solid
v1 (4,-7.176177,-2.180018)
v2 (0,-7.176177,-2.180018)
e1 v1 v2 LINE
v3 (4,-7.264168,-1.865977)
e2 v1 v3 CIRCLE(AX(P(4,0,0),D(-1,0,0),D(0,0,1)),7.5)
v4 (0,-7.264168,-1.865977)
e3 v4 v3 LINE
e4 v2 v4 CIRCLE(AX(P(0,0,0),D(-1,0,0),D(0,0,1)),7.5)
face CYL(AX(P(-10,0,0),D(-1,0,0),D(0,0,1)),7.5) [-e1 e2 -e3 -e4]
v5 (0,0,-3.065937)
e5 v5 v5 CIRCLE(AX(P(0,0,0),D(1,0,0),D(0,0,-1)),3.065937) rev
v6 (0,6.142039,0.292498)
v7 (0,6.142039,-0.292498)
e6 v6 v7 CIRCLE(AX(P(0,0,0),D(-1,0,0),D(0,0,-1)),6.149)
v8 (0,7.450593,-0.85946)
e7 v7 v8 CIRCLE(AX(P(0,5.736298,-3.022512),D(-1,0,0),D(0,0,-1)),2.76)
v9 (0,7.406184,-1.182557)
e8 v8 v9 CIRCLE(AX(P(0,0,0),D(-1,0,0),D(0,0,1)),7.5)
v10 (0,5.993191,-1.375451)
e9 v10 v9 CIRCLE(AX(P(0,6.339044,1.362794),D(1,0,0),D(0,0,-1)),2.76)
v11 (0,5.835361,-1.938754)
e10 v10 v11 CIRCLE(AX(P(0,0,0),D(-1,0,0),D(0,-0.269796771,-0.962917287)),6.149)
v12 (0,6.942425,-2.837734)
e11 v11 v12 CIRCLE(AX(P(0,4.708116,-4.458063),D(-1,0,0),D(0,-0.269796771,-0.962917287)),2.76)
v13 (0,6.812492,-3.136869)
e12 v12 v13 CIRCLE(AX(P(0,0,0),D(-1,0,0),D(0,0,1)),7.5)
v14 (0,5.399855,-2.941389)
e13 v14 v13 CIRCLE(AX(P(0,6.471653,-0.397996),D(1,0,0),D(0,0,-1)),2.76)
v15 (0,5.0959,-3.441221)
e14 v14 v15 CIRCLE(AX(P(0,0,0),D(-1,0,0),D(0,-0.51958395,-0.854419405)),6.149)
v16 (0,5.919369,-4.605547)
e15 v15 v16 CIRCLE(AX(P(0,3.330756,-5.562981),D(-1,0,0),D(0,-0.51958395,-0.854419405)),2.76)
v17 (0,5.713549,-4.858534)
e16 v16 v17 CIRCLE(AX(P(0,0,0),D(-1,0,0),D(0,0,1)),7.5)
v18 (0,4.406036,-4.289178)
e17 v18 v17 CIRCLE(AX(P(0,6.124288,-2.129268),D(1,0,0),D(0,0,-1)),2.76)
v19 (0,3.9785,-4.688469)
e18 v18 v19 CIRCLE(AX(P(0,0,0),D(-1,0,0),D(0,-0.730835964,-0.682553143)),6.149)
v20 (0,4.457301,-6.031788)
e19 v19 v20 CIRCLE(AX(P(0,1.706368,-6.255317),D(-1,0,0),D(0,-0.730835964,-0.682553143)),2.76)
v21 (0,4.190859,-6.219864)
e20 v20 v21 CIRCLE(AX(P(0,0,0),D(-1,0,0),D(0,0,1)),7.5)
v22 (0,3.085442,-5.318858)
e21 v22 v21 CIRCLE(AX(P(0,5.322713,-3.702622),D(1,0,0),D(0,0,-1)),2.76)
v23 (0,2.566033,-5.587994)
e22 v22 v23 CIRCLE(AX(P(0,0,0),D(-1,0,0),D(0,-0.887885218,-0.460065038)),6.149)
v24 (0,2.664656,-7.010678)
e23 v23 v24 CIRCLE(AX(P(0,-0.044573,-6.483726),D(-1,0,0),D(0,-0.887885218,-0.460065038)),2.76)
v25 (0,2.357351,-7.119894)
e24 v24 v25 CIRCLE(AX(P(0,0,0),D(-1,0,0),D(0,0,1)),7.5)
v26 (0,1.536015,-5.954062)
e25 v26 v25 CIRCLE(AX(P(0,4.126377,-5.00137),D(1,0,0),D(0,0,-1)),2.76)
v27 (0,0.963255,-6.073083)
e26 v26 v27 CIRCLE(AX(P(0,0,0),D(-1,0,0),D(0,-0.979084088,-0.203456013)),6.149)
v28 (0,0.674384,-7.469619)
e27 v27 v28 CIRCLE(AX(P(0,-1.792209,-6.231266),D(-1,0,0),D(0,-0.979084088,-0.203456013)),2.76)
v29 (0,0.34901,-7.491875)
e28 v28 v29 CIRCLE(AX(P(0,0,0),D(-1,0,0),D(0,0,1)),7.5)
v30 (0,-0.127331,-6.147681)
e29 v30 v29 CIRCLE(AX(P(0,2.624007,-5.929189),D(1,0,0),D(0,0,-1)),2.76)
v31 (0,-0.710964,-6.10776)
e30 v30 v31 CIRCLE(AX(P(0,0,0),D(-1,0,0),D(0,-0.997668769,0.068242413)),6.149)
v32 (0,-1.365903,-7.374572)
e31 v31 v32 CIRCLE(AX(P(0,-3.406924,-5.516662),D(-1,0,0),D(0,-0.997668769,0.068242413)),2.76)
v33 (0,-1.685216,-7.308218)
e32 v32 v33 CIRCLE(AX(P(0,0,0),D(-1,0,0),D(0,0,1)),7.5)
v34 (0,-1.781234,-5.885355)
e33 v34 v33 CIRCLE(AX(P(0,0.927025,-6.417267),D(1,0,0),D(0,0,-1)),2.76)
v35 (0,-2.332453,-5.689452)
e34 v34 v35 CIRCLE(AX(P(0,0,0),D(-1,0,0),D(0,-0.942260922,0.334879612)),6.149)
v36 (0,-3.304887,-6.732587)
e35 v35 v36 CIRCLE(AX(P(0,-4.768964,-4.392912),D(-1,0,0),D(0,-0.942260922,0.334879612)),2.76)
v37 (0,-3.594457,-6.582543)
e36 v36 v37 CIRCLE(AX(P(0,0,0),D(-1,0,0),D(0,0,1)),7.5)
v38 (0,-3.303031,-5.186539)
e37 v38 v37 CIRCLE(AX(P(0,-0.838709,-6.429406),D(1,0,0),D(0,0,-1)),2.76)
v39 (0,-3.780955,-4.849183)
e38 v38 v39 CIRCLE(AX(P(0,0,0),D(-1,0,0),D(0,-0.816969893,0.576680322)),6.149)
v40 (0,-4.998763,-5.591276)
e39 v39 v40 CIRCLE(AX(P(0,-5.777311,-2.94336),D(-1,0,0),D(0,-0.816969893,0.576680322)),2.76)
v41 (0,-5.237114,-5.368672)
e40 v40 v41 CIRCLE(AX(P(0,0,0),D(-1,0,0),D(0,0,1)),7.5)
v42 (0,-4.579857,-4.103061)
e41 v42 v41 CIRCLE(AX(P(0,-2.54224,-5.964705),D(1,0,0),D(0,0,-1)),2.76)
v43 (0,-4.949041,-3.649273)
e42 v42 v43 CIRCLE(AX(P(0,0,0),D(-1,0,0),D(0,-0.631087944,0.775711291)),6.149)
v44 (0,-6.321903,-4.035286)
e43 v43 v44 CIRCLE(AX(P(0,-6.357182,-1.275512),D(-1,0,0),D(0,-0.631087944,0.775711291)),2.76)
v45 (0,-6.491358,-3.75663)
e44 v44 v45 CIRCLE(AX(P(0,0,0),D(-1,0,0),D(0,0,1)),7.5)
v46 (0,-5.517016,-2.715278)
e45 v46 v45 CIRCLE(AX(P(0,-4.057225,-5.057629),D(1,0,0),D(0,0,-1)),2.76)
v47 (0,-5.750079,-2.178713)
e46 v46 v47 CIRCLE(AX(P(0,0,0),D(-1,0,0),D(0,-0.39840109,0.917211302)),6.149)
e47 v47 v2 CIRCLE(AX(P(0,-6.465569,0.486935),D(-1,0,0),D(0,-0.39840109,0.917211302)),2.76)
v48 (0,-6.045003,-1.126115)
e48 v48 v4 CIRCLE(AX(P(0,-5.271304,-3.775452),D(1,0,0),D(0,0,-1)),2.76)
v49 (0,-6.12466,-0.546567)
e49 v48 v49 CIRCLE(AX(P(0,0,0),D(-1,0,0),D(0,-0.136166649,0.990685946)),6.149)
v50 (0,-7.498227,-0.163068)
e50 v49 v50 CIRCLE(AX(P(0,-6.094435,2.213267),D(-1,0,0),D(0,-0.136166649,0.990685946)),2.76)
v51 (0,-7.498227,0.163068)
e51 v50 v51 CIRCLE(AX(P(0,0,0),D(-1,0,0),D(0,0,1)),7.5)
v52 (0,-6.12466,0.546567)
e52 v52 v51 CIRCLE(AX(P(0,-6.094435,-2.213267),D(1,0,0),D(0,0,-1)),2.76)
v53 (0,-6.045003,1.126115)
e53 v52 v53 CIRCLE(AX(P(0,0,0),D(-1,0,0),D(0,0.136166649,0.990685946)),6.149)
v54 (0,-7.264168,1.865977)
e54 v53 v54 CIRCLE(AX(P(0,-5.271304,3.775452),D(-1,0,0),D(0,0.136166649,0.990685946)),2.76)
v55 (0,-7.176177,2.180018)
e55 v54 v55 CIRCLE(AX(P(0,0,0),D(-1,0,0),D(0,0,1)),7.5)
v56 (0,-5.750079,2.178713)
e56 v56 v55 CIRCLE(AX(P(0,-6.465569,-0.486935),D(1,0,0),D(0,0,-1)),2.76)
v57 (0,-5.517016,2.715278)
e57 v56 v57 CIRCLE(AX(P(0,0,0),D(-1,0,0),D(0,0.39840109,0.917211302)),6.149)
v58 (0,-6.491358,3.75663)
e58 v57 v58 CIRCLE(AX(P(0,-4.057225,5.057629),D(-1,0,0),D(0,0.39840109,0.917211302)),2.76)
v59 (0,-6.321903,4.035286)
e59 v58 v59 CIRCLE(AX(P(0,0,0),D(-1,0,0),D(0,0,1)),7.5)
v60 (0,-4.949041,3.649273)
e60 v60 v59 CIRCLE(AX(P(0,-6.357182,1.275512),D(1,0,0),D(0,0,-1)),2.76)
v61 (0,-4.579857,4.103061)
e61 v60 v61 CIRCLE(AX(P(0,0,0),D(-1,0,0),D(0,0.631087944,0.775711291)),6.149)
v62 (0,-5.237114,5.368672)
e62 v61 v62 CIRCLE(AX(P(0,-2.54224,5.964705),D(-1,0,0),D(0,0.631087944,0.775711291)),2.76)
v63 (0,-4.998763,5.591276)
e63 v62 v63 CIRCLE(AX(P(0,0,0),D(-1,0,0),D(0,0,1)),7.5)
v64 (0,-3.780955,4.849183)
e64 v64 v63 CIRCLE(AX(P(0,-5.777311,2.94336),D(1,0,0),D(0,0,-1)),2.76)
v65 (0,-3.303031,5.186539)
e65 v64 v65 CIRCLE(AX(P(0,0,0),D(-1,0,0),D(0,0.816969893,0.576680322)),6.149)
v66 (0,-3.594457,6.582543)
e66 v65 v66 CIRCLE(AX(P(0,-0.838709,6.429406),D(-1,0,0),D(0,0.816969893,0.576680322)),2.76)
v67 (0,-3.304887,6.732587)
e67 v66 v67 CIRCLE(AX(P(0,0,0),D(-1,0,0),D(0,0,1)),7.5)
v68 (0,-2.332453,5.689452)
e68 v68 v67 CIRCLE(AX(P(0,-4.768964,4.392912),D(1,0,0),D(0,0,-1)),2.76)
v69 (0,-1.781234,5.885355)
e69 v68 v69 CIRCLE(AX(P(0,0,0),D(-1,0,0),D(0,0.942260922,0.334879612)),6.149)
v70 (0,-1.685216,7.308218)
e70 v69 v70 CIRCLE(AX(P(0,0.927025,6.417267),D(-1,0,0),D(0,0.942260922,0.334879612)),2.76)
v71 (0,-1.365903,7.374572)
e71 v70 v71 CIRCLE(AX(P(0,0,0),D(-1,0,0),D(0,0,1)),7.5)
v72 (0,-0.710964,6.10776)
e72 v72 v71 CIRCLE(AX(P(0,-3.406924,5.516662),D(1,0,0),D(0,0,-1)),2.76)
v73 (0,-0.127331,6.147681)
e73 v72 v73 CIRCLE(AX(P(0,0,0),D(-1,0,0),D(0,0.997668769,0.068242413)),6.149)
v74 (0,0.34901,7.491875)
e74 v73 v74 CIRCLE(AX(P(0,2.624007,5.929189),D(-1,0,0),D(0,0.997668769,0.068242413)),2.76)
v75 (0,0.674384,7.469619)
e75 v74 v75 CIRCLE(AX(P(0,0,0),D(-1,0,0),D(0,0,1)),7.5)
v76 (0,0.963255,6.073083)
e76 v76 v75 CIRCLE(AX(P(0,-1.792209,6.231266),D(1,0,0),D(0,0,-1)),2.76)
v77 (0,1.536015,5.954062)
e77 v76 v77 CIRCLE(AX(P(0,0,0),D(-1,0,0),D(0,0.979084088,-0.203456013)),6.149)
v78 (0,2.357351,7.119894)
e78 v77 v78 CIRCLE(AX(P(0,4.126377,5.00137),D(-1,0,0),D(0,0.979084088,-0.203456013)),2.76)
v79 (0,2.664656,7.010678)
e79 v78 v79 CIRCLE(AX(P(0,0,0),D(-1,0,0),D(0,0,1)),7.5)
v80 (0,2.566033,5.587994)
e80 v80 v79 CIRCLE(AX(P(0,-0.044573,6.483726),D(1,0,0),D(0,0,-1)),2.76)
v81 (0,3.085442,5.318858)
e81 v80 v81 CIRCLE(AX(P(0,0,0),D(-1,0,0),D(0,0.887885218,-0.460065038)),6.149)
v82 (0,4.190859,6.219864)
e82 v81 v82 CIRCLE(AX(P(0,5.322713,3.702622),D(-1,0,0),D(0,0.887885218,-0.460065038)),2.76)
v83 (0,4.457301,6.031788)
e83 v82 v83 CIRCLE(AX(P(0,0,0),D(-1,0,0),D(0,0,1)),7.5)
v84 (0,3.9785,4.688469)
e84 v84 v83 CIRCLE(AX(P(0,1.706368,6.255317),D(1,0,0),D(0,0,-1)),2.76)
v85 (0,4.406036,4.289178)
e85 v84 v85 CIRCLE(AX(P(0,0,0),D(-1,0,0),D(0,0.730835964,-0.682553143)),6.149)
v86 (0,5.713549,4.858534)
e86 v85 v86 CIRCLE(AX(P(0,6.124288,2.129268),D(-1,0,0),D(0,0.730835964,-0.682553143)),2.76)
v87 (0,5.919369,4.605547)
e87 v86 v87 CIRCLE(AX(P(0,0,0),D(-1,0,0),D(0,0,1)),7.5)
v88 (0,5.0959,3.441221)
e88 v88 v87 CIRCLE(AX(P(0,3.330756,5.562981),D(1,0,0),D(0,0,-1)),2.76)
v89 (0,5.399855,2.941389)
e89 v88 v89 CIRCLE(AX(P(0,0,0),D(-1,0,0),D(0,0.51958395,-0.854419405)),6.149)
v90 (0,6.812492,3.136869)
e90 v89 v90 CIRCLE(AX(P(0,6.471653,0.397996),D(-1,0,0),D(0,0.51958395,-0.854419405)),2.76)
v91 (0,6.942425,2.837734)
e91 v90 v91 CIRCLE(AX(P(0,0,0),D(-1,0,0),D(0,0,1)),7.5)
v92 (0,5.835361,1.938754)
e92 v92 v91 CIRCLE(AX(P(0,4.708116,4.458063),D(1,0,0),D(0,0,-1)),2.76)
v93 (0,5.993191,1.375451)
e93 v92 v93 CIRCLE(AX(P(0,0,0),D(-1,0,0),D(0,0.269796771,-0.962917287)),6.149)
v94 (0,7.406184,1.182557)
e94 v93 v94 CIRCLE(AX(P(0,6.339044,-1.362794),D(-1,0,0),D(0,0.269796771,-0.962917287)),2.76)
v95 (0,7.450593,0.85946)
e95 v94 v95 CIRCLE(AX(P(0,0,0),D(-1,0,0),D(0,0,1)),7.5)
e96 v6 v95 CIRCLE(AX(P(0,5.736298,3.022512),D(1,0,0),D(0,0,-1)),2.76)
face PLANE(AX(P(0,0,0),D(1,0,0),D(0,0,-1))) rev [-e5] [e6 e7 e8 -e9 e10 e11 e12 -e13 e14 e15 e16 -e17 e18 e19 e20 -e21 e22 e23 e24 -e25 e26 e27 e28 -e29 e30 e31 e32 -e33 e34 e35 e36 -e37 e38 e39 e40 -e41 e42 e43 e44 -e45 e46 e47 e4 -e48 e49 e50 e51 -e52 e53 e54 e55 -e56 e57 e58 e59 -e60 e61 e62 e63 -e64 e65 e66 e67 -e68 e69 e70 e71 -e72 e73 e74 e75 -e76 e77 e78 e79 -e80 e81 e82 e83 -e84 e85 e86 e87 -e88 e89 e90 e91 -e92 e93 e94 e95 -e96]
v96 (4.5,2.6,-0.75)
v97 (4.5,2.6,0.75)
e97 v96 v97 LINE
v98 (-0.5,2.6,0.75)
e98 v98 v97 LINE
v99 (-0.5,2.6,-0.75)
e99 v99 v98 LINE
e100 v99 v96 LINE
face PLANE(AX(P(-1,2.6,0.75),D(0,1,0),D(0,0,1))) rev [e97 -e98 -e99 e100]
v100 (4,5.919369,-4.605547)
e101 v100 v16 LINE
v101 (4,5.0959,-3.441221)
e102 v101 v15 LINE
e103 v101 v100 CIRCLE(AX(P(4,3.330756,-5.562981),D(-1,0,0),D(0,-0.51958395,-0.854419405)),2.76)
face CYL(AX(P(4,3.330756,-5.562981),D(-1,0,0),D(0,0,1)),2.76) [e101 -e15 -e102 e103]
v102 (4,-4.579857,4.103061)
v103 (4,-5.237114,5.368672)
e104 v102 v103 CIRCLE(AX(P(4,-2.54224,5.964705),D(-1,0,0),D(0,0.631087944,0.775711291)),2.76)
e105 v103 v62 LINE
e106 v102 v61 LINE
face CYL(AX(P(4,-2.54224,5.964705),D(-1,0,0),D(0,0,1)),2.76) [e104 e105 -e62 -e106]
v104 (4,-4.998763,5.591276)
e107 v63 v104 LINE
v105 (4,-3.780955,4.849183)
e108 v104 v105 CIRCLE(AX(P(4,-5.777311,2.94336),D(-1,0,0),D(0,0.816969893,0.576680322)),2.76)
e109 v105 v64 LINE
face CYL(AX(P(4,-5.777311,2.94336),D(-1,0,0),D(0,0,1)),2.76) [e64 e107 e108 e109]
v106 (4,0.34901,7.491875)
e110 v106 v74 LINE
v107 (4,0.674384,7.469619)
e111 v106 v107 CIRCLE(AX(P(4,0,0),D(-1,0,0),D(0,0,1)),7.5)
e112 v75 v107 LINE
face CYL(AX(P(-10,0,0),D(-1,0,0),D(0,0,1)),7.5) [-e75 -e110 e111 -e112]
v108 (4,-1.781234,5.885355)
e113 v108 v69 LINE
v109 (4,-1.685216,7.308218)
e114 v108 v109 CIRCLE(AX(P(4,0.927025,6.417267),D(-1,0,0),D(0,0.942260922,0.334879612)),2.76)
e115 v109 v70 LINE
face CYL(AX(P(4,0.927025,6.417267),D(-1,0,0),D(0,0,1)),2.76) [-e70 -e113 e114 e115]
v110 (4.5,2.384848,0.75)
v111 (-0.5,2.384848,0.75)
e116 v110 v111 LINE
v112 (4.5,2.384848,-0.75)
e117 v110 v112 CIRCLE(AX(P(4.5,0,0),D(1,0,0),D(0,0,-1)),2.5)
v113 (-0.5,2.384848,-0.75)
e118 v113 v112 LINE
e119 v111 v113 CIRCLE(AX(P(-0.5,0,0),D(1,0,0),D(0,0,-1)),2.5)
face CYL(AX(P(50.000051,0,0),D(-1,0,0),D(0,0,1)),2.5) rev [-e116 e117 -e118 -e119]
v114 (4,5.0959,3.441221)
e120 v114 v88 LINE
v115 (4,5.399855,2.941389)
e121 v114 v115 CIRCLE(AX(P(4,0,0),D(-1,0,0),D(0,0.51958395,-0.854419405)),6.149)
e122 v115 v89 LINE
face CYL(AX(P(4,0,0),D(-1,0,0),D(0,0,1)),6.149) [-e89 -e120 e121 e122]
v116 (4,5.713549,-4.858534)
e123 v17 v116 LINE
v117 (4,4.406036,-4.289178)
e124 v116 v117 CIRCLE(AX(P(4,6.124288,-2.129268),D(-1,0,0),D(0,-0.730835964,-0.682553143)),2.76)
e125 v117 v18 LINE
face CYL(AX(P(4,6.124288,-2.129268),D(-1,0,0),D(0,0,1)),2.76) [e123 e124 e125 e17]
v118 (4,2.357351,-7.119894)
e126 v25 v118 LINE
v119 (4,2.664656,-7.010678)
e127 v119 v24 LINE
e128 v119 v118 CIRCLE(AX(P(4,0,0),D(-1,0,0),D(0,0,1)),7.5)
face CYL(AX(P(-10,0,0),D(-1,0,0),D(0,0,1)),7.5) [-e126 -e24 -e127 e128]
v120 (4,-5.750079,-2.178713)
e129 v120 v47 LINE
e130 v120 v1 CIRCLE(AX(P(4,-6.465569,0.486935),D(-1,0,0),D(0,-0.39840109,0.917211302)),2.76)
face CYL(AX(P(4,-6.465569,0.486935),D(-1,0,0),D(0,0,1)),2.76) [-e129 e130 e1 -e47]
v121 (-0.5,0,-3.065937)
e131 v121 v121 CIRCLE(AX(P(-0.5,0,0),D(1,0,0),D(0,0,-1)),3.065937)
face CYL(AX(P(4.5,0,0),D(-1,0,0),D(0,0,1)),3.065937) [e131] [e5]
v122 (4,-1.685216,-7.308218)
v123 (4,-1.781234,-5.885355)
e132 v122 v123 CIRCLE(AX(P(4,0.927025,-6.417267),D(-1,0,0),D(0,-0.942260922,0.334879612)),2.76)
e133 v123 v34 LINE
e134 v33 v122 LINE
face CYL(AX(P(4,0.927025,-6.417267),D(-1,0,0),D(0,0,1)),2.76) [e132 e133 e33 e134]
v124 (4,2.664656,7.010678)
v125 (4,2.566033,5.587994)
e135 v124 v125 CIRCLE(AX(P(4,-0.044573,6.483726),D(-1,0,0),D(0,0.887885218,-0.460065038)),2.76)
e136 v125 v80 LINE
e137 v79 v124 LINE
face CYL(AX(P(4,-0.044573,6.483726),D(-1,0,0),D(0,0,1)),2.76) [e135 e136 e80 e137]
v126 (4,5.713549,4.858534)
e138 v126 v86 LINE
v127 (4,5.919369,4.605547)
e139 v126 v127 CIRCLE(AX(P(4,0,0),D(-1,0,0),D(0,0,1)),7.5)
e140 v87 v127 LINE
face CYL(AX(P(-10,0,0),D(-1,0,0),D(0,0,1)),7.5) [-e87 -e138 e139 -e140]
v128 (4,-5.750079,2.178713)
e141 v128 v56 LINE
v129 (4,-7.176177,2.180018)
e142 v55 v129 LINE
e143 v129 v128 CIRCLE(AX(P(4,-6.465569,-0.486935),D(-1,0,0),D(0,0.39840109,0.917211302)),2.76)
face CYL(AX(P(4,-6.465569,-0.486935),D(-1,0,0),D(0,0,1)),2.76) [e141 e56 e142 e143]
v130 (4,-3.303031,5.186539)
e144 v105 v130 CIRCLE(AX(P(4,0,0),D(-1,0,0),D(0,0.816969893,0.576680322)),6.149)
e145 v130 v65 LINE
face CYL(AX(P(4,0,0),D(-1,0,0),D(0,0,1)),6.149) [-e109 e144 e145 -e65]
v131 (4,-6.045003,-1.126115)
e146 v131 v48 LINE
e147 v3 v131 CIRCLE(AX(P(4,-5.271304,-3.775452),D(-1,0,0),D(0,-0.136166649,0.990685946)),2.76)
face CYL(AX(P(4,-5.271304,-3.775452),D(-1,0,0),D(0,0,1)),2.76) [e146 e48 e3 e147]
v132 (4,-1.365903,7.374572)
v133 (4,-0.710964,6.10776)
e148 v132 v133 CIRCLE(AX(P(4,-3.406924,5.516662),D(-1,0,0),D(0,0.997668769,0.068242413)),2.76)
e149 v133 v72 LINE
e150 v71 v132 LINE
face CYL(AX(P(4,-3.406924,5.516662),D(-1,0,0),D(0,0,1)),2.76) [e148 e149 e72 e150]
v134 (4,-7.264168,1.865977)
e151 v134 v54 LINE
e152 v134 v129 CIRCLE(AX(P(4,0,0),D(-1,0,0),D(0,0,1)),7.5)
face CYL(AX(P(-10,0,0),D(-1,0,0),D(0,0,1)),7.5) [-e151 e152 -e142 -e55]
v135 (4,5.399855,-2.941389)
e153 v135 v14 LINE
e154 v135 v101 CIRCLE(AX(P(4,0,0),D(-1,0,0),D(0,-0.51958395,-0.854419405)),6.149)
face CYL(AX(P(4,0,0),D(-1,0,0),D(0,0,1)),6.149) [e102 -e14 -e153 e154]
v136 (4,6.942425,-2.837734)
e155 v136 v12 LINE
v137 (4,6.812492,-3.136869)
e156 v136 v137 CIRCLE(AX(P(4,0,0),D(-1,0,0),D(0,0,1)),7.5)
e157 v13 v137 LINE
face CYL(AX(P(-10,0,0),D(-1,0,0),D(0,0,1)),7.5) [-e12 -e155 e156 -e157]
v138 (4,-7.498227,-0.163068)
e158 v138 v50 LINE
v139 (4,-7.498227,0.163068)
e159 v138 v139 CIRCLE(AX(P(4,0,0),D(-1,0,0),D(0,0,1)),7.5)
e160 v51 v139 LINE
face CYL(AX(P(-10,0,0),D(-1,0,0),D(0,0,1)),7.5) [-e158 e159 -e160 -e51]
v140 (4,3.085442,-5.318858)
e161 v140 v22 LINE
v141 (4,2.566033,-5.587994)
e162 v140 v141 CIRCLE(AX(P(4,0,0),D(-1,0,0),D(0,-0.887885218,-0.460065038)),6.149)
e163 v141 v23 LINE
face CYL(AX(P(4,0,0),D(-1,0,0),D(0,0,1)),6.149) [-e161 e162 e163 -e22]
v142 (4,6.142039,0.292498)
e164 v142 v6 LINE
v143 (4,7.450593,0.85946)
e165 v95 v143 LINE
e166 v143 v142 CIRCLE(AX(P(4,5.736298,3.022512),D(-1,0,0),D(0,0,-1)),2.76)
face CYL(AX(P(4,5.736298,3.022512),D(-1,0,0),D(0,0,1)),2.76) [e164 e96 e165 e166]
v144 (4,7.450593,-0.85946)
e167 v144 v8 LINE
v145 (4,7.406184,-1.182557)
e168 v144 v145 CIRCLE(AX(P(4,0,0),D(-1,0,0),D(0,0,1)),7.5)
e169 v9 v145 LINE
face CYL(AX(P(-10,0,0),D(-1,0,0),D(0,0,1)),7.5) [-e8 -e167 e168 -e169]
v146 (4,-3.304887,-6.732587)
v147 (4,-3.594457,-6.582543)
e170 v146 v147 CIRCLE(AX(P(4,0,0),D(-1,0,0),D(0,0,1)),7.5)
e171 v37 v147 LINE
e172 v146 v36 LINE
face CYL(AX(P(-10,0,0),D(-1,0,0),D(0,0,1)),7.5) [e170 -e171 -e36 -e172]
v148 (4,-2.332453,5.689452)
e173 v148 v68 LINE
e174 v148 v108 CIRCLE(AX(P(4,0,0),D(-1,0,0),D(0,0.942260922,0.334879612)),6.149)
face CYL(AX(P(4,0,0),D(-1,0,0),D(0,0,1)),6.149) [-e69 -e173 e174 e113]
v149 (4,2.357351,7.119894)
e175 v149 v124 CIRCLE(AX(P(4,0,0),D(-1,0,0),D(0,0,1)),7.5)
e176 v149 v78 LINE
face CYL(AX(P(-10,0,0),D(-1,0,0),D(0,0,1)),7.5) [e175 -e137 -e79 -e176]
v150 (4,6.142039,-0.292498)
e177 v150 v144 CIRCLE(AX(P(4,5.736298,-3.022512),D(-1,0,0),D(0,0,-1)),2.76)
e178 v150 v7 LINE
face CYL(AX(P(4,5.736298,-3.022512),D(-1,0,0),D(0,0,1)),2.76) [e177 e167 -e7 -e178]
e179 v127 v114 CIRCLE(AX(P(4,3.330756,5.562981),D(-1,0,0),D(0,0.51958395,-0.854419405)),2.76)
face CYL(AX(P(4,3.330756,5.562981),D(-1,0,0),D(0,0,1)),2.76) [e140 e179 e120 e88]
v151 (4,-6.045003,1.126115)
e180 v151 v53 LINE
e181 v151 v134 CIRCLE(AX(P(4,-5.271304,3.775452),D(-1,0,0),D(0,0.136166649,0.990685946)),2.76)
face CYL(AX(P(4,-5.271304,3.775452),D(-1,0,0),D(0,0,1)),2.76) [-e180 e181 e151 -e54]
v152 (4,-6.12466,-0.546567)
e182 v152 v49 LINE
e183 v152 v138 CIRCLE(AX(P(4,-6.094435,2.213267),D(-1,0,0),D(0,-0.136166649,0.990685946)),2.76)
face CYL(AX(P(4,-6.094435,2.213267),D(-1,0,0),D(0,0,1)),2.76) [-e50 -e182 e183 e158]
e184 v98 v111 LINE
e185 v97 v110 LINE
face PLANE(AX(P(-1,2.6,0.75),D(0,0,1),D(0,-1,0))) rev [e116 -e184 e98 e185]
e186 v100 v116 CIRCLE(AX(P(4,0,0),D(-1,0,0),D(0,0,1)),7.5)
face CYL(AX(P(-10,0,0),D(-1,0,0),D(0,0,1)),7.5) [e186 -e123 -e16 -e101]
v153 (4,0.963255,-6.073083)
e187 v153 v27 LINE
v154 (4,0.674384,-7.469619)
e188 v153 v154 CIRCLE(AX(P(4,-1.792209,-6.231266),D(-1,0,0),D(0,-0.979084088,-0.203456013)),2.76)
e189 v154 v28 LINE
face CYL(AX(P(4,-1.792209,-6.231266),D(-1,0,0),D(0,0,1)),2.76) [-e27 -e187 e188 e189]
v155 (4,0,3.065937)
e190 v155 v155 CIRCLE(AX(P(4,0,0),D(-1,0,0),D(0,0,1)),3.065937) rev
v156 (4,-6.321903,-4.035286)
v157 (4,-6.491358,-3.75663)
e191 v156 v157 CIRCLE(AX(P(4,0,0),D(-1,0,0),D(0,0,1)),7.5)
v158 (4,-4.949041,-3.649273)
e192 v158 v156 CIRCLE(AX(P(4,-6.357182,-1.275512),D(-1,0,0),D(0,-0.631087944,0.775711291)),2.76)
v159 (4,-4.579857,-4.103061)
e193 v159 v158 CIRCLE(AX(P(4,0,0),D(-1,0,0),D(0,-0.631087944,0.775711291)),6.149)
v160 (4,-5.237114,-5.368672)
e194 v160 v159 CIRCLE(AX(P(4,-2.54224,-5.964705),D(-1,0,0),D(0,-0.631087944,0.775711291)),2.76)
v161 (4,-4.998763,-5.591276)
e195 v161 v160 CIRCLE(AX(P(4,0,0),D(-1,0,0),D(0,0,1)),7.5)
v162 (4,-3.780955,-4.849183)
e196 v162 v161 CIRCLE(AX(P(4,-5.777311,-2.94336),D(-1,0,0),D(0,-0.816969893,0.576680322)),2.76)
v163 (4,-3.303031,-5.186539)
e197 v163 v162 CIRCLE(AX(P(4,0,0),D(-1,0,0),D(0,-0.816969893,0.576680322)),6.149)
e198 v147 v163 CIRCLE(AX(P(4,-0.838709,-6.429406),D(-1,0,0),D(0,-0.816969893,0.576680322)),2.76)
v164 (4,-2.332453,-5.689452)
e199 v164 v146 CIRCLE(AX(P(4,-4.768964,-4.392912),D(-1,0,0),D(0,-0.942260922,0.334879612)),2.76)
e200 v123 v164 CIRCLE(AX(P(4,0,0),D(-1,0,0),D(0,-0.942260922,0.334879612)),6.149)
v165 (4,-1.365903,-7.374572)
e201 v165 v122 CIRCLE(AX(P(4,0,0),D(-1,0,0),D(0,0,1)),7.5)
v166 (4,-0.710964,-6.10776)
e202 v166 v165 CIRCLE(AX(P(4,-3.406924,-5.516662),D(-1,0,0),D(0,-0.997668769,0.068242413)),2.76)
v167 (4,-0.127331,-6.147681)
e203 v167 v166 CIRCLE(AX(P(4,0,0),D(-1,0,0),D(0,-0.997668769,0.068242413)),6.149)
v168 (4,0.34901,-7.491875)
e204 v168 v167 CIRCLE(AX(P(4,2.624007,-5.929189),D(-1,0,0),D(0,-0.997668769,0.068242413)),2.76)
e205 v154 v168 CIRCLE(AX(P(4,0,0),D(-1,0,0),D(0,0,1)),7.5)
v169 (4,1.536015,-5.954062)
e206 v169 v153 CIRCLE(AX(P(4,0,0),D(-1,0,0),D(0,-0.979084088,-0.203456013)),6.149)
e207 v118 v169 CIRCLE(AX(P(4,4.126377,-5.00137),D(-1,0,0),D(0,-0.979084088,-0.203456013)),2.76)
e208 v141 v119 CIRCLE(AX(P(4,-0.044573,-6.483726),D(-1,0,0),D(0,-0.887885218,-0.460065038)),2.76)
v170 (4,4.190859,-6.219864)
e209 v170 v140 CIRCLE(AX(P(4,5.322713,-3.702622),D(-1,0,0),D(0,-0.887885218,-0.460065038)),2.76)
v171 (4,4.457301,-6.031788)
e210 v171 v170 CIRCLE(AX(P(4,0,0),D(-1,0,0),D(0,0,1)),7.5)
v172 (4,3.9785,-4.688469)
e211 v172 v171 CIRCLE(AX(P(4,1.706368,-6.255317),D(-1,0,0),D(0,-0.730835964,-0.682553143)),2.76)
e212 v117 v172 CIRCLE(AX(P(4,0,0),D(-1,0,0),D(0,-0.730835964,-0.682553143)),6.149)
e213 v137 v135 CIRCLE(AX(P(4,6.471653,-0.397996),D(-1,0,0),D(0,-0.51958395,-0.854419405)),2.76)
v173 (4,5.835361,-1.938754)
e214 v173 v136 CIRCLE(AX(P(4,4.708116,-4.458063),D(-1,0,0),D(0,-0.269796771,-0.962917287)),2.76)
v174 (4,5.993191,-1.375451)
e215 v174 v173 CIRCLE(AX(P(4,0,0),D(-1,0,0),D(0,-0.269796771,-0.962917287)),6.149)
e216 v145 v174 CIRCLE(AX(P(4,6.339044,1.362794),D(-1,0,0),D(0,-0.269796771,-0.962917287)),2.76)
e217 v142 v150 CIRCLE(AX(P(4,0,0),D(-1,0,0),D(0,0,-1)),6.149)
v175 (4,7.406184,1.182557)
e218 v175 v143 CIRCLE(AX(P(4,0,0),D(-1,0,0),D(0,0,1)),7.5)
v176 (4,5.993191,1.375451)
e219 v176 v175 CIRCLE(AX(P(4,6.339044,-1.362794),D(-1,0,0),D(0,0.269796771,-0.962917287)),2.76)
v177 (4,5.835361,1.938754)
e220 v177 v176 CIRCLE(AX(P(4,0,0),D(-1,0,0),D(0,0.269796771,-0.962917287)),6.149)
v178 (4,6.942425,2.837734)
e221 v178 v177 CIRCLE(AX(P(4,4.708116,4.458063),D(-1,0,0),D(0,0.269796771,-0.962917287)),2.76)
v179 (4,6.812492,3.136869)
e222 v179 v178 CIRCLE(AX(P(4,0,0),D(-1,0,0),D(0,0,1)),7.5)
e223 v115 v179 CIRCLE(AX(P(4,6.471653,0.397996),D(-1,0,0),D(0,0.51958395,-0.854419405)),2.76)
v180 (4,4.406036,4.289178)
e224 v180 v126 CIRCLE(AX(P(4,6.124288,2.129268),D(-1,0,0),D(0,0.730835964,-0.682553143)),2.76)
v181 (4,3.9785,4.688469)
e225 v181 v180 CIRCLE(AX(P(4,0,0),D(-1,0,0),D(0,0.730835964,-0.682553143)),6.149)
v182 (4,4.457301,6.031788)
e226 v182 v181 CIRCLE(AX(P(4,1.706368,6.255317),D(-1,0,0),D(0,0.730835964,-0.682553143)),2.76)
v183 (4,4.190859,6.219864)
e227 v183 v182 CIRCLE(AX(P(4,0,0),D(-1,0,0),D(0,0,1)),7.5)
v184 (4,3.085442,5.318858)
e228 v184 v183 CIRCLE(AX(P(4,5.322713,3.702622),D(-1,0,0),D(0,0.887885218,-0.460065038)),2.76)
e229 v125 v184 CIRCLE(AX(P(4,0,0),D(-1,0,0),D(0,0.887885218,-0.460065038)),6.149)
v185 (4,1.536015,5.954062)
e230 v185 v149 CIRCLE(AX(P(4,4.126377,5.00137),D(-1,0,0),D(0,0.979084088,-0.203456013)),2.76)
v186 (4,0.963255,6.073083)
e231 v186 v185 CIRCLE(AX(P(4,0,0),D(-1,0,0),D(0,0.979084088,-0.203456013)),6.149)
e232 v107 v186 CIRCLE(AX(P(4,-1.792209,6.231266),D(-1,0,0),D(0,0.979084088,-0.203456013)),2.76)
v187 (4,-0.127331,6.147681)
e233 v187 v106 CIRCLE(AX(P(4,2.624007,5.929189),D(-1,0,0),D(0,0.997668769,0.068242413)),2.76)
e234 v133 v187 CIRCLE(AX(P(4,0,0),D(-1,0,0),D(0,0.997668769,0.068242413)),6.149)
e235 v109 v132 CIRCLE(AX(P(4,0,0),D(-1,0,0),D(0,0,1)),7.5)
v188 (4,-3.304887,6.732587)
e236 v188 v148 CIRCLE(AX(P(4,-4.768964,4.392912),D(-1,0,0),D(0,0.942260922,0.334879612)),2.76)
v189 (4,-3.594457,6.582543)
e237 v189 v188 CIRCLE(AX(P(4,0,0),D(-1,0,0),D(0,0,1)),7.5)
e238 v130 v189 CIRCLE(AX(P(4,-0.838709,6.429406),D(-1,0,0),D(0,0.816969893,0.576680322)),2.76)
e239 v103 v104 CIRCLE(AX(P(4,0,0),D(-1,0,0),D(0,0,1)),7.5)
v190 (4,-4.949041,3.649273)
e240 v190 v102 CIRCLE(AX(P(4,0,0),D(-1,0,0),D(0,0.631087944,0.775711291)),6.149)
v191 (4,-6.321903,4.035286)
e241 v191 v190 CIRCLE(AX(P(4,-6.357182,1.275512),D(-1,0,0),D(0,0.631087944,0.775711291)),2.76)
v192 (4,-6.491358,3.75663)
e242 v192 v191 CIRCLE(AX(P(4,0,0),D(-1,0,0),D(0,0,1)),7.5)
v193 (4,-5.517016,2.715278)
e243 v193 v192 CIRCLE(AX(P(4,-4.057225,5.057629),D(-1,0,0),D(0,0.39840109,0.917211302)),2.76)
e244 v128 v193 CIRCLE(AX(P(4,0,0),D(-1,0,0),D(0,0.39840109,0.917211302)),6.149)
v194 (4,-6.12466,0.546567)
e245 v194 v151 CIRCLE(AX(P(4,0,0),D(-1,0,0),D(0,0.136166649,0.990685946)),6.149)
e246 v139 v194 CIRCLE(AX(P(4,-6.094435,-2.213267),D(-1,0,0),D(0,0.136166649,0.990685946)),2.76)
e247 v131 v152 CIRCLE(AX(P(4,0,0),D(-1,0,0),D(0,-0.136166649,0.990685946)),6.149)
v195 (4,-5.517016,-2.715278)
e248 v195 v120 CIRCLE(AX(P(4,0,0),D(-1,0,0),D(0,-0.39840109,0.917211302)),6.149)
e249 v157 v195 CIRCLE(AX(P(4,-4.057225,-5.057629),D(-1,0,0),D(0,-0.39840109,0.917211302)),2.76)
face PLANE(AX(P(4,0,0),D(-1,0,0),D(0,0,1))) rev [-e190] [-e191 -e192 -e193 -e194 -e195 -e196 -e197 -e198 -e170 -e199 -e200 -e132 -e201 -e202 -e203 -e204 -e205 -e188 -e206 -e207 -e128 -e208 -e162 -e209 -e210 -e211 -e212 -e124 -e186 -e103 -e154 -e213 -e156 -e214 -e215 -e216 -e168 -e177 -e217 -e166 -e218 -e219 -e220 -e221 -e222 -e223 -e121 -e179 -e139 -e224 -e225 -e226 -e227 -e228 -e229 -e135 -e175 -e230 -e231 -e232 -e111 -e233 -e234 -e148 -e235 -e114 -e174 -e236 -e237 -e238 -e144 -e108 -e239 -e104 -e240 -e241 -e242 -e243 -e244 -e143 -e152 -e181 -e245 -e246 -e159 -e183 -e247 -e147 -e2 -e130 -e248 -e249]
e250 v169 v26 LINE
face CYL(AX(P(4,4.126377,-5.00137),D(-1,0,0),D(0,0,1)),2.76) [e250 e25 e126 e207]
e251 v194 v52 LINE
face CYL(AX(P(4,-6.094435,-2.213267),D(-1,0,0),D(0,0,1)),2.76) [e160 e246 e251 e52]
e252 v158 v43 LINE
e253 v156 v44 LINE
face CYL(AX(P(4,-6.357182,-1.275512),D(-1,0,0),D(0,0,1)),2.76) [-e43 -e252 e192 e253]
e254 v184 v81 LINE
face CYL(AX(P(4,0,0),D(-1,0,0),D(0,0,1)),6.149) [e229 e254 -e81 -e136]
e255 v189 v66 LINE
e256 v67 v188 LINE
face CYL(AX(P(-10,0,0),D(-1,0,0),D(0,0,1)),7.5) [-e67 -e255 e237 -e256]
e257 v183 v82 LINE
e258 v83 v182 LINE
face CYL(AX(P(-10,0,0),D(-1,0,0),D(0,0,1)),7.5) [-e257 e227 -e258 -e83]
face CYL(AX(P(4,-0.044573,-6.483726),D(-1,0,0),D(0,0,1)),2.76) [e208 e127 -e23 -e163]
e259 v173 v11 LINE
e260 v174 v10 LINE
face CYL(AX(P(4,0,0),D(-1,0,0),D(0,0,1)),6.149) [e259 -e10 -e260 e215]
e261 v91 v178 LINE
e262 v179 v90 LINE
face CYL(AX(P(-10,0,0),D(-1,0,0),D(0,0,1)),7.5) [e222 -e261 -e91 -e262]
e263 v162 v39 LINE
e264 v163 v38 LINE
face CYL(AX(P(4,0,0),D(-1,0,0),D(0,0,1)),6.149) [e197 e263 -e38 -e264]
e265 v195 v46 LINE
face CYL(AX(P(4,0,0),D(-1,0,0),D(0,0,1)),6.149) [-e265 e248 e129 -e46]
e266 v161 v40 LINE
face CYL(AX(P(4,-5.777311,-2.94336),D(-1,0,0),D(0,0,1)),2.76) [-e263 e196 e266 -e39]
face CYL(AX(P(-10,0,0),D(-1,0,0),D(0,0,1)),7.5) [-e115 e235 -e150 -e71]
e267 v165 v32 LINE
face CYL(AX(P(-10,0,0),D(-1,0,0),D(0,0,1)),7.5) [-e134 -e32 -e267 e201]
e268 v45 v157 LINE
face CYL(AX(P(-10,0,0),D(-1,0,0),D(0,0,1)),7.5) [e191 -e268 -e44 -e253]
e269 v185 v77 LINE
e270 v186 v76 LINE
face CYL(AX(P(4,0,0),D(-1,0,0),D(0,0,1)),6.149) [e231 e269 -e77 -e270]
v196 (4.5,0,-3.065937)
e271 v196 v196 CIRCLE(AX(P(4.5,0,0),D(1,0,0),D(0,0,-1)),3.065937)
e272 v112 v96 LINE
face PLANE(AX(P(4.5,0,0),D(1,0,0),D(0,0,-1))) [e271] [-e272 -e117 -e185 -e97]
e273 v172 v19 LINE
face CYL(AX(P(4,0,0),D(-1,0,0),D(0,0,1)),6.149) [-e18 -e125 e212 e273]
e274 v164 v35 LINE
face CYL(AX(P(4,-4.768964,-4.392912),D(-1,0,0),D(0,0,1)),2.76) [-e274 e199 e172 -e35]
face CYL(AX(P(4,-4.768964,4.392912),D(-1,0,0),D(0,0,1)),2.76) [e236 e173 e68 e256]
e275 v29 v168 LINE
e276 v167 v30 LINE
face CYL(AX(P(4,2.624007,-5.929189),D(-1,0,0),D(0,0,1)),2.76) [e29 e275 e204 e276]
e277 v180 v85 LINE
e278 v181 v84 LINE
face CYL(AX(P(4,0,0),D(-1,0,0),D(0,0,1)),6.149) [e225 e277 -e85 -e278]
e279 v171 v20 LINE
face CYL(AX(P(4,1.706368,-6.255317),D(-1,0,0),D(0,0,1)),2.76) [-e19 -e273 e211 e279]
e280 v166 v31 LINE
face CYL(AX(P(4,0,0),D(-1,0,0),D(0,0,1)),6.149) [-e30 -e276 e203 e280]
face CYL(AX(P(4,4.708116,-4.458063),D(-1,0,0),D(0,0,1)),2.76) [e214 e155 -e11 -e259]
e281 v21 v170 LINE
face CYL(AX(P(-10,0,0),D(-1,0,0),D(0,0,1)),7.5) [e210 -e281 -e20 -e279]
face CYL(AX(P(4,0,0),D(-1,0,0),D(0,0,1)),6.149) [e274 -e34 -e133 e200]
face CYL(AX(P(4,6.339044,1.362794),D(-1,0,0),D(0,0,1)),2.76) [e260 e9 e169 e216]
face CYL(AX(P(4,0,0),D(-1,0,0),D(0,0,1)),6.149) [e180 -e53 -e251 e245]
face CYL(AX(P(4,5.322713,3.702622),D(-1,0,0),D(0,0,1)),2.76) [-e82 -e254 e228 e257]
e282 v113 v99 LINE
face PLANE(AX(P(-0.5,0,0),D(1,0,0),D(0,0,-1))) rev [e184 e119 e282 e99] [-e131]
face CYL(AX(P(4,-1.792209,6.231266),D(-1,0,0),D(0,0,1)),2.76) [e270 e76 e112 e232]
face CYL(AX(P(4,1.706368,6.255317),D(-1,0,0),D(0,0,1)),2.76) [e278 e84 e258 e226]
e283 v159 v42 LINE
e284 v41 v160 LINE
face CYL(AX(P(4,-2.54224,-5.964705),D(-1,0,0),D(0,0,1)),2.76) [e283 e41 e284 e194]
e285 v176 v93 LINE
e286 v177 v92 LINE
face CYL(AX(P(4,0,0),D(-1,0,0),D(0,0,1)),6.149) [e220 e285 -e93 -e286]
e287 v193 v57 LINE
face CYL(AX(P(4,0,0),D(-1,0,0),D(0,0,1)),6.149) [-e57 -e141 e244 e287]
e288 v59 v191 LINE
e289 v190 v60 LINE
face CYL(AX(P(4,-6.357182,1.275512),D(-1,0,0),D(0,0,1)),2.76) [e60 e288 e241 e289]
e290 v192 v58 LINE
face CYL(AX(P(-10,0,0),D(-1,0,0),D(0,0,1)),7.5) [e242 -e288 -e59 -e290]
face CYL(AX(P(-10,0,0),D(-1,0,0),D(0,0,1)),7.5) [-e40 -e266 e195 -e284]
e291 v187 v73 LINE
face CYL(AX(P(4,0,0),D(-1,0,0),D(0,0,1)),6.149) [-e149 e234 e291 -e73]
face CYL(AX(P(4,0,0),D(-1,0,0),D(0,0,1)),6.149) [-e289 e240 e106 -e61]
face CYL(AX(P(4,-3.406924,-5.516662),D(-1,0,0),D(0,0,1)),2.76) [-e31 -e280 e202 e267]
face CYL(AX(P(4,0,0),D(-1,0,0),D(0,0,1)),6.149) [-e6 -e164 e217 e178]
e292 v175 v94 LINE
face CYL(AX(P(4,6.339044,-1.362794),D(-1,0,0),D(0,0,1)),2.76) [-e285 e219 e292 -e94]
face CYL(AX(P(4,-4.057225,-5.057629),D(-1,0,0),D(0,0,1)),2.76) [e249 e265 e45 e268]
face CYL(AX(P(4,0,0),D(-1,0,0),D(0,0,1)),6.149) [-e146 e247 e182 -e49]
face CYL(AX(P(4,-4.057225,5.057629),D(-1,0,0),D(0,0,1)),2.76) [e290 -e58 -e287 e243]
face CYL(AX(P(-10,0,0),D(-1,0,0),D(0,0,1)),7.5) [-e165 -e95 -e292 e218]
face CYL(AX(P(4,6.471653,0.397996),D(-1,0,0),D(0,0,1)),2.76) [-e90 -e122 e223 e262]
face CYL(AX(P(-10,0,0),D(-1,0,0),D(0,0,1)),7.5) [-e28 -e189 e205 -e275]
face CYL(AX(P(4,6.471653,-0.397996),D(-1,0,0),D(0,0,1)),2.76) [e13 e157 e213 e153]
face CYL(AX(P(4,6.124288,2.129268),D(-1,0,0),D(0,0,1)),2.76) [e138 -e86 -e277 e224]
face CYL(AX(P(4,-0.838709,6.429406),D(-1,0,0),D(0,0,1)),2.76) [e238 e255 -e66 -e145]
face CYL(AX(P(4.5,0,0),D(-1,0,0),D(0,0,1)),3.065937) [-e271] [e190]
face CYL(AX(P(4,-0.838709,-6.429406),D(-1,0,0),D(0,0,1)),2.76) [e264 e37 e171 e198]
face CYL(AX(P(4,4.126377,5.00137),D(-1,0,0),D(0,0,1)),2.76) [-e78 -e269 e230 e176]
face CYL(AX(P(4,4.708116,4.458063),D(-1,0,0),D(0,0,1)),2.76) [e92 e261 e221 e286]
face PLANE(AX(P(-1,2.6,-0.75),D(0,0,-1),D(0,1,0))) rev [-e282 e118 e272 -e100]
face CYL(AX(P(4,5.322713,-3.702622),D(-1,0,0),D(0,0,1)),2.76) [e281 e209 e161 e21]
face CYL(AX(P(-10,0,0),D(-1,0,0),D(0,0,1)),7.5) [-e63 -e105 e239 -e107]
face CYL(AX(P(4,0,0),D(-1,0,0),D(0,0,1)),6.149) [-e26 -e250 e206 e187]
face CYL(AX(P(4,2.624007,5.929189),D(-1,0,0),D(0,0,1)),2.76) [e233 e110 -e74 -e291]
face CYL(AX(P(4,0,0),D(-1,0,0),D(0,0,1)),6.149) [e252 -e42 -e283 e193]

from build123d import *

# Parameters (mm, degrees)
BASPROSKE_W         = 4
BASPROSKE_H         = 7.5
TOOTHCUT_DEPTH      = 12.335784049
TEETHCUTS_COUNT     = 23
TEETHCUTS_ANGLE     = 344.347826087
BORSKE_R            = 2.5
BORE_DEPTH          = 50.0000508
EXTRUDE1_DEPTH      = 0.5
EXTRUDE1_DEPTH_BACK = 4.5
SKETCH1_R           = 3.065937152
SKETCH1_R_2         = 2.5
SKETCH2_W           = 1.5
SKETCH2_H           = 2.6
CUT_EXTRUDE1_DEPTH  = 5.5


with BuildPart() as part:
    # BasProSke → Base-Revolve (revolve)
    with BuildSketch(Plane(origin=(0, 0, 0), x_dir=(1, 0, 0), z_dir=(0, 1, 0))):
        with Locations((2, 3.75)):
            Rectangle(BASPROSKE_W, BASPROSKE_H)
    revolve(axis=Axis((-10, 0, 0), (1, 0, 0)))

    # TooCutSke → ToothCut (cut, through all)
    with BuildSketch(Plane(origin=(0, 0, 0), x_dir=(0, 0, -1), z_dir=(1, 0, 0))):
        with BuildLine():
            ThreePointArc((0.292498096, 6.142039227), (0, 6.149), (-0.292498096, 6.142039227))
            ThreePointArc((-0.292498096, 6.142039227), (-0.495998432, 6.847302274), (-0.878204189, 7.473981707))
            ThreePointArc((-0.878204189, 7.473981707), (0, 7.5254), (0.878204189, 7.473981707))
            ThreePointArc((0.878204189, 7.473981707), (0.495998432, 6.847302274), (0.292498096, 6.142039227))
        make_face()
    toothcut = extrude(amount=TOOTHCUT_DEPTH, mode=Mode.SUBTRACT)

    # TeethCuts: ToothCut ×23 about axis
    teethcuts_axis = Axis((-10, 0, 0), (1, 0, 0))
    for i in range(1, TEETHCUTS_COUNT):
        add(toothcut.rotate(teethcuts_axis, i * TEETHCUTS_ANGLE / (TEETHCUTS_COUNT - 1)), mode=Mode.SUBTRACT)

    # BorSke → Bore (cut, symmetric)
    with BuildSketch(Plane(origin=(0, 0, 0), x_dir=(0, 0, -1), z_dir=(1, 0, 0))):
        Circle(BORSKE_R)
    extrude(amount=BORE_DEPTH, both=True, mode=Mode.SUBTRACT)

    # Sketch1 → Extrude1 (add, two sides: drawn at the far end of the back side and taken through both)
    with BuildSketch(Plane(origin=(4, 0, 0), x_dir=(0, 0, -1), z_dir=(1, 0, 0)).offset(-EXTRUDE1_DEPTH_BACK)):
        Circle(SKETCH1_R)
        Circle(SKETCH1_R_2, mode=Mode.SUBTRACT)
    extrude(amount=EXTRUDE1_DEPTH + EXTRUDE1_DEPTH_BACK)

    # Sketch2 → Cut-Extrude1 (cut)
    with BuildSketch(Plane(origin=(4.5, 0, 0), x_dir=(0, 0, -1), z_dir=(1, 0, 0))):
        with Locations((0, 1.3)):
            Rectangle(SKETCH2_W, SKETCH2_H)
    extrude(amount=-CUT_EXTRUDE1_DEPTH, mode=Mode.SUBTRACT)


solid = part.part
